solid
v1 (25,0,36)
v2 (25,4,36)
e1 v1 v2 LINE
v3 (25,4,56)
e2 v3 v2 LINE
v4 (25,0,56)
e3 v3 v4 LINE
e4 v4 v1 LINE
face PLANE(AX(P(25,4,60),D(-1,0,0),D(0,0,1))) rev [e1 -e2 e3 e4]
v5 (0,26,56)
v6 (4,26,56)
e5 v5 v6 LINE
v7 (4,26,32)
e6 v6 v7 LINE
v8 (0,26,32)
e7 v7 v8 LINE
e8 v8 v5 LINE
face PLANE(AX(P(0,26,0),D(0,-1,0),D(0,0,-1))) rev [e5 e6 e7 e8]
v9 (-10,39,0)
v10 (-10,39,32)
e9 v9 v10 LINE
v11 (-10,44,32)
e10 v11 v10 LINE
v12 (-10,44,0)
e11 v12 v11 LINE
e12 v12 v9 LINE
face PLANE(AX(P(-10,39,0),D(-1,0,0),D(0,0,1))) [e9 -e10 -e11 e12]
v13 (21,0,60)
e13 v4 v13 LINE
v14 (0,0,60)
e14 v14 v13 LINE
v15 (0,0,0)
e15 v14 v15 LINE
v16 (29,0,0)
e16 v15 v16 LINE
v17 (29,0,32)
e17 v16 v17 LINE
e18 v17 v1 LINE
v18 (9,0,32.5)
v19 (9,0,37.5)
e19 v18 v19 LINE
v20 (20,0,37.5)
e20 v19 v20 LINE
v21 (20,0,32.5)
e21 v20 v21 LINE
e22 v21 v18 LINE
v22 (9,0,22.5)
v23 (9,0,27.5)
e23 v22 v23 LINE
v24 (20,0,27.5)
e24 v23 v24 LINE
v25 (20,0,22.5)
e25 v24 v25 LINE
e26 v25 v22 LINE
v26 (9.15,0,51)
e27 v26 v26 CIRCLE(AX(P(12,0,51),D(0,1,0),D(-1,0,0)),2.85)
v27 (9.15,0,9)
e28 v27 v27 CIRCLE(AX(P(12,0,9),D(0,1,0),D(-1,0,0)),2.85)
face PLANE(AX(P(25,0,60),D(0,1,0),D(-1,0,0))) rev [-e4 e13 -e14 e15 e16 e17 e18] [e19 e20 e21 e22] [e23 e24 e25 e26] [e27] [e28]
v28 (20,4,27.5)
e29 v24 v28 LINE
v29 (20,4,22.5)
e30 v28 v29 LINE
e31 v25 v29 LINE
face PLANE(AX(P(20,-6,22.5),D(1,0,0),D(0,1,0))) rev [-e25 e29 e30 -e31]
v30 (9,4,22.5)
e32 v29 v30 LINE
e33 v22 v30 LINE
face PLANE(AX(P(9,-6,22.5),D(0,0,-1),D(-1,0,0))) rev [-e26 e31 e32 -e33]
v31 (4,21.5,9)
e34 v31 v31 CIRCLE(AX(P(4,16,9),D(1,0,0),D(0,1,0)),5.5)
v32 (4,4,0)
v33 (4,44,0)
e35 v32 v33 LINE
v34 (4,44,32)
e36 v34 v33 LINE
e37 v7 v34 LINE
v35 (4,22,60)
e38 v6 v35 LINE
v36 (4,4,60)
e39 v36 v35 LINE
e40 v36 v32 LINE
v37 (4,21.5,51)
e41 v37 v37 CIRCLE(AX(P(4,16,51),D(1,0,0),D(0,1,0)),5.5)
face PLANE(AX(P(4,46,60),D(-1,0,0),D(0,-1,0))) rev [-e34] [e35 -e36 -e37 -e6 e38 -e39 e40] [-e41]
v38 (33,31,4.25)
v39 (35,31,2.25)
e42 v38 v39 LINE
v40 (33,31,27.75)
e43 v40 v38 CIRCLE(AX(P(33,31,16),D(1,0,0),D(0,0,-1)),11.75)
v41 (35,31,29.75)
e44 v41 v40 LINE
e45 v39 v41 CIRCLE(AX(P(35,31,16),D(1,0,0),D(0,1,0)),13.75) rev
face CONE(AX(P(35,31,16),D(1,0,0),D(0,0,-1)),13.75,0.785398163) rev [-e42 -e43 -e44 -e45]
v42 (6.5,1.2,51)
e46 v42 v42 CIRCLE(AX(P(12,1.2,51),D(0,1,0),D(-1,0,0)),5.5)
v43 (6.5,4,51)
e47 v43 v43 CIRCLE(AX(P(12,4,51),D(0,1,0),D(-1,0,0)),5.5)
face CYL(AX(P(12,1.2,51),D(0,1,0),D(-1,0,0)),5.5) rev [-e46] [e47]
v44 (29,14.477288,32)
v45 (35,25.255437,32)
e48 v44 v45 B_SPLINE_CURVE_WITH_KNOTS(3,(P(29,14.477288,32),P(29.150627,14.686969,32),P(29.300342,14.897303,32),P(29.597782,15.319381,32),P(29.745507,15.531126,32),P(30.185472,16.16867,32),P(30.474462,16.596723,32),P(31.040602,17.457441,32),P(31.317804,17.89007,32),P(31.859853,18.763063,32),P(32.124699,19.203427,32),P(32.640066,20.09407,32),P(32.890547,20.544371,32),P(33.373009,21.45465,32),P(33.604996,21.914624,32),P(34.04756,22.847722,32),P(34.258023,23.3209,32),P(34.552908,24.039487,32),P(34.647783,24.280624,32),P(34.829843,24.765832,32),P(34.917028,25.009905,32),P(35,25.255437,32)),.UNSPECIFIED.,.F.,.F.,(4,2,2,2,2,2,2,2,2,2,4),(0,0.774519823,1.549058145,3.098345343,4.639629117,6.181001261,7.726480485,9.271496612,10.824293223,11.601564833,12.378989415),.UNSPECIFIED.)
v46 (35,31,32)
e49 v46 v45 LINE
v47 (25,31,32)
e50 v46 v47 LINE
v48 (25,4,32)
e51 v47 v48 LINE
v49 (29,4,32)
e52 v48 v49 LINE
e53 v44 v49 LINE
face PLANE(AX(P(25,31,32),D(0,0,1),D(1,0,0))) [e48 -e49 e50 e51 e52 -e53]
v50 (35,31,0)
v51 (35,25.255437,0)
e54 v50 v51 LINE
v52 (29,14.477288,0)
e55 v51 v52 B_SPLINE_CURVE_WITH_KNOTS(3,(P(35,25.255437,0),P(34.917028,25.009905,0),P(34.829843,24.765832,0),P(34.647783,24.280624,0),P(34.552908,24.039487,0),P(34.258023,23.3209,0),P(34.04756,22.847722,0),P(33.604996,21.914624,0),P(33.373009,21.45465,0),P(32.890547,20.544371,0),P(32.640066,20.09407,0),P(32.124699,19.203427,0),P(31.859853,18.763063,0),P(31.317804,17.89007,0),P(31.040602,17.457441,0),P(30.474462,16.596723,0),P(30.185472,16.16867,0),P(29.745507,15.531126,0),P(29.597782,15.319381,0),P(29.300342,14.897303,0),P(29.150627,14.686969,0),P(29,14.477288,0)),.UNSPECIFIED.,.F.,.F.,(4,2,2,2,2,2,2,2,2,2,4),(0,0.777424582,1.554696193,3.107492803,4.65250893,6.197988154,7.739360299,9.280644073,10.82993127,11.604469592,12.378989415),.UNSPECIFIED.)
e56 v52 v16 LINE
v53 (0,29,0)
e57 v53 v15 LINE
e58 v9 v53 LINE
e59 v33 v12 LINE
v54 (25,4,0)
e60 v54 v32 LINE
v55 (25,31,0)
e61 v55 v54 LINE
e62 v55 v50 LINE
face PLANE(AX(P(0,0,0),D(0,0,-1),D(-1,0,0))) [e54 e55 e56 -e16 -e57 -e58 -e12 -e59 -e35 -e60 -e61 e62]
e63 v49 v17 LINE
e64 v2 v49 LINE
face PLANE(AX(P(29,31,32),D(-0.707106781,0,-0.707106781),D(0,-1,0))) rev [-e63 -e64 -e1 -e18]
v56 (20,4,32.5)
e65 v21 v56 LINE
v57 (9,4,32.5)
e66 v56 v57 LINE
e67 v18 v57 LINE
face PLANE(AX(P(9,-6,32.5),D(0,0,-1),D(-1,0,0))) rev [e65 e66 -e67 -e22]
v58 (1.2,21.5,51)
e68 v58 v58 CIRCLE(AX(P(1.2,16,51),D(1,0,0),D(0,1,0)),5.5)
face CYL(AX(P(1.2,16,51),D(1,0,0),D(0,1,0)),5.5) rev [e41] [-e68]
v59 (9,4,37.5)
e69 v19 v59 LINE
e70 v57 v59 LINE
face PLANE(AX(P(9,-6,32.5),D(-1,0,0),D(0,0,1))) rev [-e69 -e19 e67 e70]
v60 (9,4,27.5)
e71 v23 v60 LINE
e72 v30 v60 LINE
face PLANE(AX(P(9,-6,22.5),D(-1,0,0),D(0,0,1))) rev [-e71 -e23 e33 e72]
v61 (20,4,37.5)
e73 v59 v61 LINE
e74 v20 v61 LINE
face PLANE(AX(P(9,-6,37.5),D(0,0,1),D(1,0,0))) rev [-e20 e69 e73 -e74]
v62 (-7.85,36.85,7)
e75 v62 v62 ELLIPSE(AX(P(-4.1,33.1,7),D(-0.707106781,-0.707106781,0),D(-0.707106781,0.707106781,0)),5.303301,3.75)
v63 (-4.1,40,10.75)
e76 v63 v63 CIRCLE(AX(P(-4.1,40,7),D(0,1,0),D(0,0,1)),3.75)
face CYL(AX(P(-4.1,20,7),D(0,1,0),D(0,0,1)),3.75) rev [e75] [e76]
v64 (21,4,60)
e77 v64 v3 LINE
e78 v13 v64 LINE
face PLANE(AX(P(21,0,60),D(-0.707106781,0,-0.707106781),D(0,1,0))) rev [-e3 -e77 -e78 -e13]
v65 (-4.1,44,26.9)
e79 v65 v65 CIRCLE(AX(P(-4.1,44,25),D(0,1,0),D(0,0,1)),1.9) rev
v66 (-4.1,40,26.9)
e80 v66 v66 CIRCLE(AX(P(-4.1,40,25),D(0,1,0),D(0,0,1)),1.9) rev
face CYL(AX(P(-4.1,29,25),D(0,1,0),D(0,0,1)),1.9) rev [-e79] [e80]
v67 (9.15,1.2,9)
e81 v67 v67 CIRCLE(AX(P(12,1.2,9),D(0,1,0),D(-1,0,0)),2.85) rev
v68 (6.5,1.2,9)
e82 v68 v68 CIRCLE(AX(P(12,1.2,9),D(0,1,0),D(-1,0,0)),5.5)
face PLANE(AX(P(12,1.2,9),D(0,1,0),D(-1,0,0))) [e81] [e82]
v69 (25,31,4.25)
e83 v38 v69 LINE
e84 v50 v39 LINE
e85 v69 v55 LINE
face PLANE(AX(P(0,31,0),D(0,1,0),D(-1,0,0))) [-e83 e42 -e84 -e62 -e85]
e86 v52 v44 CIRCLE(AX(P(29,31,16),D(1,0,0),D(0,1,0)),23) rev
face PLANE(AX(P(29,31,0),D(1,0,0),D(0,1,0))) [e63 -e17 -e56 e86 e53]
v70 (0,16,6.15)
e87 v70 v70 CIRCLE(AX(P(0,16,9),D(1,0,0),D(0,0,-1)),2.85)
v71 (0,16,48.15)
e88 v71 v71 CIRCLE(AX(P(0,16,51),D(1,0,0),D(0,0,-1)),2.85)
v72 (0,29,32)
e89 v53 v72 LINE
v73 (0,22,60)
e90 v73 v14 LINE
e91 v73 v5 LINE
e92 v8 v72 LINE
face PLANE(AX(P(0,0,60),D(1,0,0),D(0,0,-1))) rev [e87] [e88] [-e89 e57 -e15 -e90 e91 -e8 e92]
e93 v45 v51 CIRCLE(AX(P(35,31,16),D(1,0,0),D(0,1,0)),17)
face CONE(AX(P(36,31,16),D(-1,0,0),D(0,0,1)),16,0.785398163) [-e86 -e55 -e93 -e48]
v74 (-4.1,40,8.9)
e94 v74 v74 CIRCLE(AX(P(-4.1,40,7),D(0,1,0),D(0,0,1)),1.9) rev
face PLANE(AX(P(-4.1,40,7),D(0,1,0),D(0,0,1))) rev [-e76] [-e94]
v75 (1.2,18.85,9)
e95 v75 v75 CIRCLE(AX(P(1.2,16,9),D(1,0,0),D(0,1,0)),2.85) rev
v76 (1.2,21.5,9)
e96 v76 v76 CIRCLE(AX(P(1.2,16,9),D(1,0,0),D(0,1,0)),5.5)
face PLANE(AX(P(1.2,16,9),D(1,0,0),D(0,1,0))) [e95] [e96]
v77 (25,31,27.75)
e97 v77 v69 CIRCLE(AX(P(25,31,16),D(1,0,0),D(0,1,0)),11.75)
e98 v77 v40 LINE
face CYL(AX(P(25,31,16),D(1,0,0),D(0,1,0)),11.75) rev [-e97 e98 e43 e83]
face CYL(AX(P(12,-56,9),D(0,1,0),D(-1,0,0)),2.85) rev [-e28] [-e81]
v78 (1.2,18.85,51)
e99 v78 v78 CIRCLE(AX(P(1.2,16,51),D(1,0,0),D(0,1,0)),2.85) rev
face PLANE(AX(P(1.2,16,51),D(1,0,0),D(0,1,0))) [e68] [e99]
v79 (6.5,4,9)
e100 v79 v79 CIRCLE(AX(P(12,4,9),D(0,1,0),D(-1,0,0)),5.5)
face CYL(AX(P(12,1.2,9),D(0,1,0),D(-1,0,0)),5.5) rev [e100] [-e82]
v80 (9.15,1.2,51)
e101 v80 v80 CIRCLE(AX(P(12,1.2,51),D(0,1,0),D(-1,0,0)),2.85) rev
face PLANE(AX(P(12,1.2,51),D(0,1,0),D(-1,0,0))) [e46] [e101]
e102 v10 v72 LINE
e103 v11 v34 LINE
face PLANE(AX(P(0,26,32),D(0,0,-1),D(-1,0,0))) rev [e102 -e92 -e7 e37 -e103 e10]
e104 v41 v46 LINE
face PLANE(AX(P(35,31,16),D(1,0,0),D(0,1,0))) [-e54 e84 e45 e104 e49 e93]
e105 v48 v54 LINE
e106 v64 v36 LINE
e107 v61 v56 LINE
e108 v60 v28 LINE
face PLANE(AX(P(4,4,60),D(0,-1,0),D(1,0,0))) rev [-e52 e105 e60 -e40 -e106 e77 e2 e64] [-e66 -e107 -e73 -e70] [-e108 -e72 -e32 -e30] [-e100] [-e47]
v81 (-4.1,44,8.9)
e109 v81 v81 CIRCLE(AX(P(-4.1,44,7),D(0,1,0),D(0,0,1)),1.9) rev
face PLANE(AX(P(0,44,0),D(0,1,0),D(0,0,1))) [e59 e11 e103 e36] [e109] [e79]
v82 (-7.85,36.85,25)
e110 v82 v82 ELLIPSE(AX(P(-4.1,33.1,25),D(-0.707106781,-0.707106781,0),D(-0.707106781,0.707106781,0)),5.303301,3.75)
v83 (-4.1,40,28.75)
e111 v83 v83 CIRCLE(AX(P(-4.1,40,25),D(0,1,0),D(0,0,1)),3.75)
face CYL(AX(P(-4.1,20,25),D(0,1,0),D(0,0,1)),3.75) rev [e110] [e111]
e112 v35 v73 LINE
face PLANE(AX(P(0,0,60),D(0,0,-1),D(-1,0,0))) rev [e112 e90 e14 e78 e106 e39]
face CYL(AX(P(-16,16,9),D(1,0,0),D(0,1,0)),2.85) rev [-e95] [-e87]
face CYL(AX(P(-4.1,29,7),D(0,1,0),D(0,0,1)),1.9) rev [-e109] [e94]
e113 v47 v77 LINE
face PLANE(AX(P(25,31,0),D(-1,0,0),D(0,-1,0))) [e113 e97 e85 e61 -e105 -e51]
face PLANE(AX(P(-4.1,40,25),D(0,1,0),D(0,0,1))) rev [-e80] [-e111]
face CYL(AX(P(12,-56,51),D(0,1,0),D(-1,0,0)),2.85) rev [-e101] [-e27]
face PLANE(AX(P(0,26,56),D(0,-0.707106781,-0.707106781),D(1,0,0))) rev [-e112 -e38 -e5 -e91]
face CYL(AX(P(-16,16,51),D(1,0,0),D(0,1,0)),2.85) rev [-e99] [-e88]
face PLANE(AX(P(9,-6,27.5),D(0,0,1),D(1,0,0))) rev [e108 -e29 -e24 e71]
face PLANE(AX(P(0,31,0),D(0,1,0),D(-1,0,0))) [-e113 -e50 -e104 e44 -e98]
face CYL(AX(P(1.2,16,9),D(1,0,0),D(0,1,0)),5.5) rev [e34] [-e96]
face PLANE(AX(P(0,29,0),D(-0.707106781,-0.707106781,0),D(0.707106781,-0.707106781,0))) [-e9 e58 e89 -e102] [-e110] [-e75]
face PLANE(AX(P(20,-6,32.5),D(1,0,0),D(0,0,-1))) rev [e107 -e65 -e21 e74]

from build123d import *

# Parameters (mm, degrees)
BOSS_EXTRU_1_DEPTH          = 60
ENL_V_START                 = -4
ENL_V_MAT_EXTRU_1_OUTLINE_R = 2.85
ENL_V_MAT_EXTRU_1_DEPTH     = 4
ESQUISSE3_R                 = 5.5
ENL_V_MAT_EXTRU_2_DEPTH     = 2.8
ESQUISSE4_R                 = 2.85
ENL_V_MAT_EXTRU_3_DEPTH     = 20
ESQUISSE5_R                 = 5.5
ENL_V_MAT_EXTRU_4_DEPTH     = 2.8
ESQUISSE6_W                 = 4
ESQUISSE6_H                 = 32
BOSS_EXTRU_2_DEPTH          = 31
CHANFREIN1_SIZE             = 4
ESQUISSE7_R                 = 11.75
ENL_V_MAT_EXTRU_5_DEPTH     = 4
ESQUISSE9_W                 = 4
ESQUISSE9_H                 = 28
ENL_V_MAT_EXTRU_6_DEPTH     = 20
BOSS_EXTRU_4_DEPTH          = 32
ENL_V_MAT_EXTRU_7_REACH     = 82.975
ESQUISSE11_R                = 1.9
ENL_V_START_2               = -6
ESQUISSE12_R                = 3.75
ENL_V_MAT_EXTRU_8_DEPTH     = 20
CHANFREIN2_SIZE             = 4
ESQUISSE13_W                = 14
ESQUISSE13_H                = 32
ENL_V_MAT_EXTRU_9_DEPTH     = 2
BOSS_EXTRU_5_START          = 6
BOSS_EXTRU_5_DEPTH          = 6
CHANFREIN3_SIZE             = 7
CHANFREIN4_SIZE             = 2
ESQUISSE15_W                = 11
ESQUISSE15_H                = 5
ENL_V_MAT_EXTRU_10_DEPTH    = 10


# Read off the part's stored shape, not the designer's step: Enlèv. mat.-Extru.1
# Some blends are built 0.0001 mm under size
with BuildPart() as part:
    # Esquisse1 → Boss.-Extru.1 (new body)
    with BuildSketch(Plane.XY):
        Polygon((0, 0), (0, 46), (4, 46), (4, 4), (25, 4), (25, 0), align=None)
    extrude(amount=BOSS_EXTRU_1_DEPTH)

    # Enlèv. mat.-Extru.1 outline → Enlèv. mat.-Extru.1 (cut)
    with BuildSketch(Plane(origin=(0, 4, 0), x_dir=(1, 0, 0), z_dir=(0, 1, 0)).offset(ENL_V_START)):
        with Locations((12, -9)):
            Circle(ENL_V_MAT_EXTRU_1_OUTLINE_R)
        with Locations((12, -51)):
            Circle(ENL_V_MAT_EXTRU_1_OUTLINE_R)
    extrude(amount=ENL_V_MAT_EXTRU_1_DEPTH, mode=Mode.SUBTRACT)

    # Esquisse3 → Enlèv. mat.-Extru.2 (cut)
    with BuildSketch(Plane(origin=(0, 4, 0), x_dir=(1, 0, 0), z_dir=(0, 1, 0))):
        with Locations(Location((12, -9, 0), (0, 0, 180))):
            Circle(ESQUISSE3_R)
        with Locations(Location((12, -51, 0), (0, 0, 180))):
            Circle(ESQUISSE3_R)
    extrude(amount=-ENL_V_MAT_EXTRU_2_DEPTH, mode=Mode.SUBTRACT)

    # Esquisse4 → Enlèv. mat.-Extru.3 (cut)
    with BuildSketch(Plane(origin=(4, 0, 0), x_dir=(0, 0, -1), z_dir=(1, 0, 0))):
        with Locations(Location((-51, 16, 0), (0, 0, 90))):
            Circle(ESQUISSE4_R)
        with Locations(Location((-9, 16, 0), (0, 0, 90))):
            Circle(ESQUISSE4_R)
    extrude(amount=-ENL_V_MAT_EXTRU_3_DEPTH, mode=Mode.SUBTRACT)

    # Esquisse5 → Enlèv. mat.-Extru.4 (cut)
    with BuildSketch(Plane(origin=(4, 0, 0), x_dir=(0, 0, -1), z_dir=(1, 0, 0))):
        with Locations(Location((-51, 16, 0), (0, 0, 90))):
            Circle(ESQUISSE5_R)
        with Locations(Location((-9, 16, 0), (0, 0, 90))):
            Circle(ESQUISSE5_R)
    extrude(amount=-ENL_V_MAT_EXTRU_4_DEPTH, mode=Mode.SUBTRACT)

    # Esquisse6 → Boss.-Extru.2 (add)
    with BuildSketch(Plane.XZ):
        with Locations((27, 16)):
            Rectangle(ESQUISSE6_W, ESQUISSE6_H)
    extrude(amount=-BOSS_EXTRU_2_DEPTH)

    # Chanfrein1
    chanfrein1_edges = [part.edges().sort_by_distance(p)[0] for p in [
        (25, 2, 32),
    ]]
    chamfer(chanfrein1_edges, length=CHANFREIN1_SIZE - 0.0001)  # a hair under: the kernel refuses the full size

    # Esquisse7 → Enlèv. mat.-Extru.5 (cut)
    with BuildSketch(Plane(origin=(29, 0, 0), x_dir=(0, 0, -1), z_dir=(1, 0, 0))):
        with Locations((-16, 31)):
            Circle(ESQUISSE7_R)
    extrude(amount=-ENL_V_MAT_EXTRU_5_DEPTH, mode=Mode.SUBTRACT)

    # Esquisse9 → Enlèv. mat.-Extru.6 (cut)
    with BuildSketch(Plane(origin=(0, 46, 0), x_dir=(1, 0, 0), z_dir=(0, 1, 0))):
        with Locations((2, -46)):
            Rectangle(ESQUISSE9_W, ESQUISSE9_H)
    extrude(amount=-ENL_V_MAT_EXTRU_6_DEPTH, mode=Mode.SUBTRACT)

    # Esquisse10 → Boss.-Extru.4 (add)
    with BuildSketch(Plane.XY.offset(32)):
        Polygon((0, 29), (-10, 39), (-10, 46), (0, 46), (4, 46), (4, 26), (0, 26), align=None)
    extrude(amount=-BOSS_EXTRU_4_DEPTH)

    # Enlèv. mat.-Extru.7: up to this plane
    enl_v_mat_extru_7_end = Plane(origin=(0, 29, 0), z_dir=(-0.7071067811865436, -0.7071067811865517, 0))
    # Esquisse11 → Enlèv. mat.-Extru.7 (cut, up to the surface)
    with BuildSketch(Plane(origin=(0, 46, 0), x_dir=(1, 0, 0), z_dir=(0, 1, 0)), mode=Mode.PRIVATE) as enl_v_mat_extru_7_sk1:
        with Locations(Location((-4.1, -7, 0), (0, 0, 270))):
            Circle(ESQUISSE11_R)
    enl_v_mat_extru_7_tool1 = split(extrude(enl_v_mat_extru_7_sk1.sketch, amount=-ENL_V_MAT_EXTRU_7_REACH, mode=Mode.PRIVATE), bisect_by=enl_v_mat_extru_7_end, keep=Keep.BOTH, mode=Mode.PRIVATE)
    add(enl_v_mat_extru_7_tool1.solids().sort_by_distance((-4.1, 46, 7))[0], mode=Mode.SUBTRACT)
    # Esquisse11 → Enlèv. mat.-Extru.7 (cut, up to the surface)
    with BuildSketch(Plane(origin=(0, 46, 0), x_dir=(1, 0, 0), z_dir=(0, 1, 0)), mode=Mode.PRIVATE) as enl_v_mat_extru_7_sk2:
        with Locations(Location((-4.1, -25, 0), (0, 0, 270))):
            Circle(ESQUISSE11_R)
    enl_v_mat_extru_7_tool2 = split(extrude(enl_v_mat_extru_7_sk2.sketch, amount=-ENL_V_MAT_EXTRU_7_REACH, mode=Mode.PRIVATE), bisect_by=enl_v_mat_extru_7_end, keep=Keep.BOTH, mode=Mode.PRIVATE)
    add(enl_v_mat_extru_7_tool2.solids().sort_by_distance((-4.1, 46, 25))[0], mode=Mode.SUBTRACT)

    # Esquisse12 → Enlèv. mat.-Extru.8 (cut)
    with BuildSketch(Plane(origin=(0, 46, 0), x_dir=(1, 0, 0), z_dir=(0, 1, 0)).offset(ENL_V_START_2)):
        with Locations(Location((-4.1, -7, 0), (0, 0, 270))):
            Circle(ESQUISSE12_R)
        with Locations(Location((-4.1, -25, 0), (0, 0, 270))):
            Circle(ESQUISSE12_R)
    extrude(amount=-ENL_V_MAT_EXTRU_8_DEPTH, mode=Mode.SUBTRACT)

    # Chanfrein2
    chanfrein2_edges = [part.edges().sort_by_distance(p)[0] for p in [
        (2, 26, 60),
        (25, 2, 60),
    ]]
    chamfer(chanfrein2_edges, length=CHANFREIN2_SIZE)

    # Esquisse13 → Enlèv. mat.-Extru.9 (cut)
    with BuildSketch(Plane(origin=(0, 46, 0), x_dir=(1, 0, 0), z_dir=(0, 1, 0))):
        with Locations((-3, -16)):
            Rectangle(ESQUISSE13_W, ESQUISSE13_H)
    extrude(amount=-ENL_V_MAT_EXTRU_9_DEPTH, mode=Mode.SUBTRACT)

    # Esquisse14 → Boss.-Extru.5 (add)
    with BuildSketch(Plane(origin=(29, 0, 0), x_dir=(0, 0, -1), z_dir=(1, 0, 0)).offset(BOSS_EXTRU_5_START)):
        with BuildLine():
            Line((-32, 31), (-27.75, 31))
            ThreePointArc((-27.75, 31), (-16, 19.25), (-4.25, 31))
            Line((-4.25, 31), (0, 31))
            ThreePointArc((0, 31), (-16, 15), (-32, 31))
        make_face()
    extrude(amount=-BOSS_EXTRU_5_DEPTH)

    # Chanfrein3
    # the kernel refuses this chamfer: 7 mm, written as the material it adds along each edge
    with BuildSketch(Plane(origin=(29, 31, 16), x_dir=(0, 0, -1), z_dir=(0, 1, 0))) as chanfrein3_piece_1_section:
        Polygon((16 + CHANFREIN3_SIZE, 0), (16, -CHANFREIN3_SIZE), (16, 0), align=None)
    chanfrein3_piece_1 = revolve(axis=Axis((29, 31, 16), (-1, 0, 0)), revolution_arc=180, mode=Mode.PRIVATE)
    chanfrein3_piece_1 = split(chanfrein3_piece_1, bisect_by=Plane(origin=(32, 14.901456645, 32), z_dir=(0, 0, -1)), keep=Keep.TOP, mode=Mode.PRIVATE)
    chanfrein3_piece_1 = split(chanfrein3_piece_1, bisect_by=Plane(origin=(32, 14.901456645, 0), z_dir=(0, 0, 1)), keep=Keep.TOP, mode=Mode.PRIVATE)
    chanfrein3_piece_1 = split(chanfrein3_piece_1, bisect_by=Plane(origin=(35, 14.901456645, 16), z_dir=(-1, 0, 0)), keep=Keep.TOP, mode=Mode.PRIVATE)
    add(chanfrein3_piece_1)

    # Chanfrein4
    chanfrein4_edges = [part.edges().sort_by_distance(p)[0] for p in [
        (35, 19.25, 16),
    ]]
    chamfer(chanfrein4_edges, length=CHANFREIN4_SIZE)

    # Esquisse15 → Enlèv. mat.-Extru.10 (cut)
    with BuildSketch(Plane(origin=(0, 4, 0), x_dir=(1, 0, 0), z_dir=(0, 1, 0))):
        with Locations((14.5, -25)):
            Rectangle(ESQUISSE15_W, ESQUISSE15_H)
        with Locations((14.5, -35)):
            Rectangle(ESQUISSE15_W, ESQUISSE15_H)
    extrude(amount=-ENL_V_MAT_EXTRU_10_DEPTH, mode=Mode.SUBTRACT)


solid = part.part
